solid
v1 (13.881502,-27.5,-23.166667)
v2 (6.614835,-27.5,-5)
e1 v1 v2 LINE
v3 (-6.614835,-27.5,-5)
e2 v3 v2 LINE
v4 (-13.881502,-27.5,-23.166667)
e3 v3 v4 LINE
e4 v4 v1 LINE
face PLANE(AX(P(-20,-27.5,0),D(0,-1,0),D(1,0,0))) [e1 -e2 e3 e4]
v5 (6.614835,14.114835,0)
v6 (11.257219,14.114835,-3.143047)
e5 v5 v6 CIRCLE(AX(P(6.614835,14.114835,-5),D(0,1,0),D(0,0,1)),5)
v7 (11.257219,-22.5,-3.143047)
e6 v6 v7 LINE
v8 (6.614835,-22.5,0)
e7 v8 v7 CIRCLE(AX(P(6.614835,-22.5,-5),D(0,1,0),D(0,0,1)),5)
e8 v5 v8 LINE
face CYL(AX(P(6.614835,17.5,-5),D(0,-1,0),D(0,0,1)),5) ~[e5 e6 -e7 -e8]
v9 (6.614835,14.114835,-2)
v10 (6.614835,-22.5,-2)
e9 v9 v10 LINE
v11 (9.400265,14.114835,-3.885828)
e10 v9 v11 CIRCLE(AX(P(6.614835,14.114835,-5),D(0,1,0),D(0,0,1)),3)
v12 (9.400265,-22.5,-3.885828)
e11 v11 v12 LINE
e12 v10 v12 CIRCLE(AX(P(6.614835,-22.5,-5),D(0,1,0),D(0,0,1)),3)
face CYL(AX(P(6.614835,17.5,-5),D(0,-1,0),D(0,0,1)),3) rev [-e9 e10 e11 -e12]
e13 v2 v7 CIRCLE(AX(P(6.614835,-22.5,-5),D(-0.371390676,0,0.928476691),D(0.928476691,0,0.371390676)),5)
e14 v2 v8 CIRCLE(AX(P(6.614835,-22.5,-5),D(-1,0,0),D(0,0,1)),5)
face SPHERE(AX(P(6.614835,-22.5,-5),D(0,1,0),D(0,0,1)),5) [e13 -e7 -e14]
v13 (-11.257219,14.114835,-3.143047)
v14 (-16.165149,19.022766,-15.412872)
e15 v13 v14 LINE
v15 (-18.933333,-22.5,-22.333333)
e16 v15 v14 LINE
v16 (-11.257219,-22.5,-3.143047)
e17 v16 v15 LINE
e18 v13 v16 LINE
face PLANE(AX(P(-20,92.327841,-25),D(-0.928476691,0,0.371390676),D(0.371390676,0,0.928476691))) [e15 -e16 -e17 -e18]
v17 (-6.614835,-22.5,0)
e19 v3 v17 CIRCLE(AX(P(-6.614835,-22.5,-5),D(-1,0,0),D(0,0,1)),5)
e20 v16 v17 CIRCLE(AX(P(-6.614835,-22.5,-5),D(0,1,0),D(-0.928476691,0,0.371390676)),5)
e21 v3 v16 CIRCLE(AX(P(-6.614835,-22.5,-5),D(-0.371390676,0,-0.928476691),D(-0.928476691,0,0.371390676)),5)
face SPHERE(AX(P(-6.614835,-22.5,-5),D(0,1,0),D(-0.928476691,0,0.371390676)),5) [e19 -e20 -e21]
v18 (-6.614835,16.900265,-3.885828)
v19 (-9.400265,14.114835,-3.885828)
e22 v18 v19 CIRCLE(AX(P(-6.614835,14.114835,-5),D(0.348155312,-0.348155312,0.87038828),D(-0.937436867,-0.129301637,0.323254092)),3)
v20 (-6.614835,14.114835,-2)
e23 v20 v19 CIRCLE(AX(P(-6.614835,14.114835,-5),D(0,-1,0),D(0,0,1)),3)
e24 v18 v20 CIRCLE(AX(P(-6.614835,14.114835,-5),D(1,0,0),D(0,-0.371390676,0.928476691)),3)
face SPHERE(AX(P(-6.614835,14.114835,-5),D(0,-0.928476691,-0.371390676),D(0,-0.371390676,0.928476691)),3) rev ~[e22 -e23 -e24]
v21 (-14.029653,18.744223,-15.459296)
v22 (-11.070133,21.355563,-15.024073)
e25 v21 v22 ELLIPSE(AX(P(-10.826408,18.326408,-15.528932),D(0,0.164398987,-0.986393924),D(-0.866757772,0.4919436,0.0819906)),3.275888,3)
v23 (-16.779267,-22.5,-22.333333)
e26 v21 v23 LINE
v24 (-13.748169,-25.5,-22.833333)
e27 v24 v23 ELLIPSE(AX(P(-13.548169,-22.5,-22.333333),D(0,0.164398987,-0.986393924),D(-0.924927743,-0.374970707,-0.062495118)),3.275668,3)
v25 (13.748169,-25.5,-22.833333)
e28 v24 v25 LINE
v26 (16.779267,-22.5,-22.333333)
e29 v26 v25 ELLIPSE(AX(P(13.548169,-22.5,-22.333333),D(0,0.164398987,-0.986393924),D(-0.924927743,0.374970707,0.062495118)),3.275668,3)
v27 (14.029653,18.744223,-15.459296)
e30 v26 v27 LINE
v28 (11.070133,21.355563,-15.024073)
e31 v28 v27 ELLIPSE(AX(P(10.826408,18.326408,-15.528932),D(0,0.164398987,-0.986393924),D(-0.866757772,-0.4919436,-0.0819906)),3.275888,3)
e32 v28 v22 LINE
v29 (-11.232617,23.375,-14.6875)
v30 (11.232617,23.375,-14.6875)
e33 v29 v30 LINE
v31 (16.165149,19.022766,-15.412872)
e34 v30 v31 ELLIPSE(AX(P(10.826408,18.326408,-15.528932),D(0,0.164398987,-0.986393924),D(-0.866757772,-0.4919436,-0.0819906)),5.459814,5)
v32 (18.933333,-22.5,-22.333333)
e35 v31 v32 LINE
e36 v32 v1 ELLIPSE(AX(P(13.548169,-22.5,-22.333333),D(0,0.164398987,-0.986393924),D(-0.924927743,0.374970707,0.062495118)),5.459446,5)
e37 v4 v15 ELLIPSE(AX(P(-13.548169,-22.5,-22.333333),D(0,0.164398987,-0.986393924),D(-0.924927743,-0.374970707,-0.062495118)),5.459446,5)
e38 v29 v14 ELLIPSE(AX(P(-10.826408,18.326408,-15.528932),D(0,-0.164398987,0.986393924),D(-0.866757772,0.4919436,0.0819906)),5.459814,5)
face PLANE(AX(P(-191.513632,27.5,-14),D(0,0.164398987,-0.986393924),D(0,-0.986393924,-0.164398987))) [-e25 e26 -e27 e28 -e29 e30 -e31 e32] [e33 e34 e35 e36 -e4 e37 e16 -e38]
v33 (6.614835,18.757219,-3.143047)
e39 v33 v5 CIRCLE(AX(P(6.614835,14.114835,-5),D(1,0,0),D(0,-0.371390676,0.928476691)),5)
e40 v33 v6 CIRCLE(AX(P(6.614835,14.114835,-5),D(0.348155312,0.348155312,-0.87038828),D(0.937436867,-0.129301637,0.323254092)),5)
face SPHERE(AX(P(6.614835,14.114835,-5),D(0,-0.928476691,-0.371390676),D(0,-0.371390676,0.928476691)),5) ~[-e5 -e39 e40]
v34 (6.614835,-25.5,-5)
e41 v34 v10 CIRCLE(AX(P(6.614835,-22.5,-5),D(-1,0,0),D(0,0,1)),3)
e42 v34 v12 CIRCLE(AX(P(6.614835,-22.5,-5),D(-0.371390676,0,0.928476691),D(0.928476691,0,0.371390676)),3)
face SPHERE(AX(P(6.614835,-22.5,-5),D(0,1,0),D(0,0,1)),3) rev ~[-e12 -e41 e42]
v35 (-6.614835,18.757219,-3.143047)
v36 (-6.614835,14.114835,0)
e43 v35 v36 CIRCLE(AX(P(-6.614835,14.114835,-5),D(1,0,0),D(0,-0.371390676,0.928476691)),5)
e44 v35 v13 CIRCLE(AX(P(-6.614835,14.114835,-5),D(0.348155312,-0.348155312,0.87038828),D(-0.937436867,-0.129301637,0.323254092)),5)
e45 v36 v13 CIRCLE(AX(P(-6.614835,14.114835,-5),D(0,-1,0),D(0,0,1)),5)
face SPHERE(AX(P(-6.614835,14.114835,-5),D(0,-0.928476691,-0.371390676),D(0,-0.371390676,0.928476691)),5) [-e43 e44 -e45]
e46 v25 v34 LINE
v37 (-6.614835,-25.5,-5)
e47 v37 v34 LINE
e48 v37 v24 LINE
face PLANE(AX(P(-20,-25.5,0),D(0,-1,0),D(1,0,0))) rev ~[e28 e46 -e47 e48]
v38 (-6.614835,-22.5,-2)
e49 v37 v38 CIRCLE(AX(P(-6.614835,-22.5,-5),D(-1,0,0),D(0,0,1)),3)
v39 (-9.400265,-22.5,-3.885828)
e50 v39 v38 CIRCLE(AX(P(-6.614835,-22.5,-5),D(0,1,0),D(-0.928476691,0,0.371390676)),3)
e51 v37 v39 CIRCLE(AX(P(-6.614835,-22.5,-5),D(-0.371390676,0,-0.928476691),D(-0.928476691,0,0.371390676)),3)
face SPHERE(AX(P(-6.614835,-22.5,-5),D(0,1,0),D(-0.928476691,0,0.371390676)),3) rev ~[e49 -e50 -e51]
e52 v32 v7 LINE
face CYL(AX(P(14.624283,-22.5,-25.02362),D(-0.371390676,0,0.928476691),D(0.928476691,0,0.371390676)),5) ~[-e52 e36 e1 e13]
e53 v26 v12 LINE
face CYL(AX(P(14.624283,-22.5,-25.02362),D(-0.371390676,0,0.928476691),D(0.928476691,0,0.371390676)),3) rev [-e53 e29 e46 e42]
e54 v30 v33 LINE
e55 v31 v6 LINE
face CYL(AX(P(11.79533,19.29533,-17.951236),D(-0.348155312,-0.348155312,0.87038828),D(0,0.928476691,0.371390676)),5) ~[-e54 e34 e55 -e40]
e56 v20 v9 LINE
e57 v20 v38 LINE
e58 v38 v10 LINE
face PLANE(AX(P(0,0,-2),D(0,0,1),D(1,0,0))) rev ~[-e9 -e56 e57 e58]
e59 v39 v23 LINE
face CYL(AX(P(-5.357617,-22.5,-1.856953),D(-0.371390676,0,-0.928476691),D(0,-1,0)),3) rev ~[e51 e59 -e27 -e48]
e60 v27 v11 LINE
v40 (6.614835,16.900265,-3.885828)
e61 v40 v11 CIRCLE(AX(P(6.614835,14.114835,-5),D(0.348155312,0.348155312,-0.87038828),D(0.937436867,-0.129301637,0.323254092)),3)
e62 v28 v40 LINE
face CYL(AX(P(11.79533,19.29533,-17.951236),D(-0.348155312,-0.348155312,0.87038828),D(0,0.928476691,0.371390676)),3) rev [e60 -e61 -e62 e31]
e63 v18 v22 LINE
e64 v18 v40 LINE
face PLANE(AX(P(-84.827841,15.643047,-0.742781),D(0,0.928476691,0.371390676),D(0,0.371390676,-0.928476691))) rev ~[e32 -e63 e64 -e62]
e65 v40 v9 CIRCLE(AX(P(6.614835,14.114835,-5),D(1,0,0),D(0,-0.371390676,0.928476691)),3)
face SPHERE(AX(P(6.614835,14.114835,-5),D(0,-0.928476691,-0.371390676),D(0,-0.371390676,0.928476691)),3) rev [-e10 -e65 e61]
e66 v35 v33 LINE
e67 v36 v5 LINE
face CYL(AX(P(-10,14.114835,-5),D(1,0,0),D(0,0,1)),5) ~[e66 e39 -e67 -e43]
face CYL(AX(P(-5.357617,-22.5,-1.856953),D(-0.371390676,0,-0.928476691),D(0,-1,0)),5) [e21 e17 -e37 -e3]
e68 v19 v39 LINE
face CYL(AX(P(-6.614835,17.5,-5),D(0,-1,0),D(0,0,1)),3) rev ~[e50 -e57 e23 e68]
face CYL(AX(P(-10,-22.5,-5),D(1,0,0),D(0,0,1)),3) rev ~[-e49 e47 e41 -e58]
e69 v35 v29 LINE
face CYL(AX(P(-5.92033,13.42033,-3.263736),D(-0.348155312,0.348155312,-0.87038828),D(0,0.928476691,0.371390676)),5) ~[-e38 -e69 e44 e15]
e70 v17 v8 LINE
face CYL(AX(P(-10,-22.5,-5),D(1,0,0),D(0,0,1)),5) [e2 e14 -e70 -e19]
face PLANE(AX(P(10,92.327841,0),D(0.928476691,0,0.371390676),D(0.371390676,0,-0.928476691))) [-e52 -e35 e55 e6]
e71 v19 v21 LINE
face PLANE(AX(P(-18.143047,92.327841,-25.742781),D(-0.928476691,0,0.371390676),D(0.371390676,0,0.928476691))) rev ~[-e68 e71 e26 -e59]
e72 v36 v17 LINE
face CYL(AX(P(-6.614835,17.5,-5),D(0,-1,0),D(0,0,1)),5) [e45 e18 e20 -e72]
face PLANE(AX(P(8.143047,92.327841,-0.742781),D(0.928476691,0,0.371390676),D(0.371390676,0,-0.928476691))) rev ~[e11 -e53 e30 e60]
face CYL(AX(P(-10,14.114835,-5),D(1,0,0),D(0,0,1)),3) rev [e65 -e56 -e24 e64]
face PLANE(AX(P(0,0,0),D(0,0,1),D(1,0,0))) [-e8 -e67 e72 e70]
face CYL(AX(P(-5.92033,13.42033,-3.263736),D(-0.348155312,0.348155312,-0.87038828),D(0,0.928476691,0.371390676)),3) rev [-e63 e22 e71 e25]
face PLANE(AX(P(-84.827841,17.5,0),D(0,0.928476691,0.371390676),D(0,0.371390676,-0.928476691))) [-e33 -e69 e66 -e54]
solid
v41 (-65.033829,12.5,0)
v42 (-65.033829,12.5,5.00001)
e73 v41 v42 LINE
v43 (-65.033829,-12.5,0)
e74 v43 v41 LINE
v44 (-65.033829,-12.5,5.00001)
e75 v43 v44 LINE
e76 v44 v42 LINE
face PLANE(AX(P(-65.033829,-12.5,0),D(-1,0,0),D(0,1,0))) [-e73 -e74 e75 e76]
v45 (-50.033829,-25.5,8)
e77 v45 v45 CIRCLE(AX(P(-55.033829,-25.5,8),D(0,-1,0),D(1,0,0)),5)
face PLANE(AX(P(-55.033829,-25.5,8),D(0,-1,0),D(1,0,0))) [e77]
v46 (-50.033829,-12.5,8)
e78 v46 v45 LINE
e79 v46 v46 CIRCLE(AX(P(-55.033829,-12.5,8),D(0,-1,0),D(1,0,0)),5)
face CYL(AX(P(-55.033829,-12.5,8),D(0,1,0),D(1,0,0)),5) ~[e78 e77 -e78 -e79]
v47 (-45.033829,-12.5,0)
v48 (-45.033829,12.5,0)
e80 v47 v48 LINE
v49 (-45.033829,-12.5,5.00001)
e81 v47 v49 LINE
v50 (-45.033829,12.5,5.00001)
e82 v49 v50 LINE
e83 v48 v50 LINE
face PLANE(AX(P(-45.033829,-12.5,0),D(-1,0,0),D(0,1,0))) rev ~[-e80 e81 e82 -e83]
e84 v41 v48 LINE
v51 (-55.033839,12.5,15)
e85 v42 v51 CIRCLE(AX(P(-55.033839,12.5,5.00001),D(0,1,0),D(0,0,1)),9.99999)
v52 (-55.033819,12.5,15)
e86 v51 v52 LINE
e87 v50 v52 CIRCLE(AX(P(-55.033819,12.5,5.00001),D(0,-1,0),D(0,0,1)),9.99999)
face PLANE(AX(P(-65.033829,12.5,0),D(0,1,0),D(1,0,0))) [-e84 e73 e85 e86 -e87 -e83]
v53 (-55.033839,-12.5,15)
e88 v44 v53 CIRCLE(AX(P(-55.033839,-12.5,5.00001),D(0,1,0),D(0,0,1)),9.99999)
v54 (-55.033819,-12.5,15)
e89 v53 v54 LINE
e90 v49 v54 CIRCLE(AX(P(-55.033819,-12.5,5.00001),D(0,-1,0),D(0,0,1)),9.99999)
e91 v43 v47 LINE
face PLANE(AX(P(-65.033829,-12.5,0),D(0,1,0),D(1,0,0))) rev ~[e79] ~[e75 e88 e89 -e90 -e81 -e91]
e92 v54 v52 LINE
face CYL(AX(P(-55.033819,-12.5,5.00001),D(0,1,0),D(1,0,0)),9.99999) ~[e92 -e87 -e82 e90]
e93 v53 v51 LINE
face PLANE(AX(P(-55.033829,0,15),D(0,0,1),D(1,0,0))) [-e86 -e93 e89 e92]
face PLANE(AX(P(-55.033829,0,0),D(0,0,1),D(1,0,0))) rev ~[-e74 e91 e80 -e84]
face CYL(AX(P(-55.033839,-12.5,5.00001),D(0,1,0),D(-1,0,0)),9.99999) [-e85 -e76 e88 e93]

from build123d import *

# Parameters (mm, degrees)
F0_W        = 40
F0_H        = 55
F1_DEPTH    = 25
F2_T1_DEPTH = 383.0272640249
F3_T1_DEPTH = 184.6556819565
F3_T3_DEPTH = 169.6556819565
F4_R        = 5
F5_T        = -2
F0_W_2      = 20
F0_H_2      = 25
F6_DEPTH    = 15
F7_R        = 9.99999
F8_R        = 5
F9_DEPTH    = 13


# Not quite as in the source:
# - a fillet or chamfer that OpenCascade refuses, or shapes differently, is made with other operations: its cross-section is extruded or revolved along the edge and cut away or added
# - a fillet or chamfer is up to 0.001 mm smaller than in the source, because OpenCascade refuses the exact size


with BuildPart() as f1:
    # F0 (on Top) → F1 (new body)
    with BuildSketch(Plane.XY):
        Rectangle(F0_W, F0_H)
    extrude(amount=-F1_DEPTH)

    # F2: chamfer of 11 x 66 on 1 edges, made by hand

    # F2_s2 → F2_t1 (cut)
    with BuildSketch(Plane.YZ.offset(-191.5136320125)):
        Polygon((27.5, -14), (-38.5, -25), (27.5, -25), align=None)
    extrude(amount=F2_T1_DEPTH, mode=Mode.SUBTRACT)

    # F3: chamfer of 10 x 25 on 3 edges, made by hand

    # F3_s2 → F3_t1 (cut)
    with BuildSketch(Plane.XZ.offset(-92.3278409783)):
        Polygon((10, 0), (20, -25), (20, 0), align=None)
        Polygon((-20, -25), (-10, 0), (-20, 0), align=None)
    extrude(amount=F3_T1_DEPTH, mode=Mode.SUBTRACT)

    # F3_s4 → F3_t3 (cut)
    with BuildSketch(Plane.YZ.offset(-84.8278409783)):
        Polygon((17.5, 0), (27.5, -25), (27.5, 0), align=None)
    extrude(amount=F3_T3_DEPTH, mode=Mode.SUBTRACT)

    # F4
    f4_edges = [f1.edges().sort_by_distance(p)[0] for p in [
        (10, -5, 0),
        (0, -27.5, 0),
        (-10, -5, 0),
        (0, 17.5, 0),
        (-12.9375, 20.4375, -7.34375),
        (12.9375, 20.4375, -7.34375),
        (-14.633333, -27.5, -11.583333),
        (14.633333, -27.5, -11.583333),
    ]]
    fillet(f4_edges, radius=F4_R)

    # F5
    f5_openings = [f1.faces().sort_by_distance(p)[0] for p in [
        (0, -2.846063, -19.057677),
    ]]
    offset(amount=F5_T, openings=f5_openings)


with BuildPart() as f6:
    # F0 (on Top) → F6 (new body)
    with BuildSketch(Plane.XY):
        with Locations((-55.0338290632, 0)):
            Rectangle(F0_W_2, F0_H_2)
    extrude(amount=F6_DEPTH)

    # F7 (radius 10 in the source; OpenCascade refuses exactly that, so slightly less here)
    f7_edges = [f6.edges().sort_by_distance(p)[0] for p in [
        (-45.033829, 0, 15),
        (-65.033829, 0, 15),
    ]]
    fillet(f7_edges, radius=F7_R)

    # F8 (on face) → F9 (join)
    with BuildSketch(Plane.XZ.offset(12.5)):
        with Locations((-55.0338290632, 8)):
            Circle(F8_R)
    extrude(amount=F9_DEPTH)


solid = Compound([f1.part, f6.part])
